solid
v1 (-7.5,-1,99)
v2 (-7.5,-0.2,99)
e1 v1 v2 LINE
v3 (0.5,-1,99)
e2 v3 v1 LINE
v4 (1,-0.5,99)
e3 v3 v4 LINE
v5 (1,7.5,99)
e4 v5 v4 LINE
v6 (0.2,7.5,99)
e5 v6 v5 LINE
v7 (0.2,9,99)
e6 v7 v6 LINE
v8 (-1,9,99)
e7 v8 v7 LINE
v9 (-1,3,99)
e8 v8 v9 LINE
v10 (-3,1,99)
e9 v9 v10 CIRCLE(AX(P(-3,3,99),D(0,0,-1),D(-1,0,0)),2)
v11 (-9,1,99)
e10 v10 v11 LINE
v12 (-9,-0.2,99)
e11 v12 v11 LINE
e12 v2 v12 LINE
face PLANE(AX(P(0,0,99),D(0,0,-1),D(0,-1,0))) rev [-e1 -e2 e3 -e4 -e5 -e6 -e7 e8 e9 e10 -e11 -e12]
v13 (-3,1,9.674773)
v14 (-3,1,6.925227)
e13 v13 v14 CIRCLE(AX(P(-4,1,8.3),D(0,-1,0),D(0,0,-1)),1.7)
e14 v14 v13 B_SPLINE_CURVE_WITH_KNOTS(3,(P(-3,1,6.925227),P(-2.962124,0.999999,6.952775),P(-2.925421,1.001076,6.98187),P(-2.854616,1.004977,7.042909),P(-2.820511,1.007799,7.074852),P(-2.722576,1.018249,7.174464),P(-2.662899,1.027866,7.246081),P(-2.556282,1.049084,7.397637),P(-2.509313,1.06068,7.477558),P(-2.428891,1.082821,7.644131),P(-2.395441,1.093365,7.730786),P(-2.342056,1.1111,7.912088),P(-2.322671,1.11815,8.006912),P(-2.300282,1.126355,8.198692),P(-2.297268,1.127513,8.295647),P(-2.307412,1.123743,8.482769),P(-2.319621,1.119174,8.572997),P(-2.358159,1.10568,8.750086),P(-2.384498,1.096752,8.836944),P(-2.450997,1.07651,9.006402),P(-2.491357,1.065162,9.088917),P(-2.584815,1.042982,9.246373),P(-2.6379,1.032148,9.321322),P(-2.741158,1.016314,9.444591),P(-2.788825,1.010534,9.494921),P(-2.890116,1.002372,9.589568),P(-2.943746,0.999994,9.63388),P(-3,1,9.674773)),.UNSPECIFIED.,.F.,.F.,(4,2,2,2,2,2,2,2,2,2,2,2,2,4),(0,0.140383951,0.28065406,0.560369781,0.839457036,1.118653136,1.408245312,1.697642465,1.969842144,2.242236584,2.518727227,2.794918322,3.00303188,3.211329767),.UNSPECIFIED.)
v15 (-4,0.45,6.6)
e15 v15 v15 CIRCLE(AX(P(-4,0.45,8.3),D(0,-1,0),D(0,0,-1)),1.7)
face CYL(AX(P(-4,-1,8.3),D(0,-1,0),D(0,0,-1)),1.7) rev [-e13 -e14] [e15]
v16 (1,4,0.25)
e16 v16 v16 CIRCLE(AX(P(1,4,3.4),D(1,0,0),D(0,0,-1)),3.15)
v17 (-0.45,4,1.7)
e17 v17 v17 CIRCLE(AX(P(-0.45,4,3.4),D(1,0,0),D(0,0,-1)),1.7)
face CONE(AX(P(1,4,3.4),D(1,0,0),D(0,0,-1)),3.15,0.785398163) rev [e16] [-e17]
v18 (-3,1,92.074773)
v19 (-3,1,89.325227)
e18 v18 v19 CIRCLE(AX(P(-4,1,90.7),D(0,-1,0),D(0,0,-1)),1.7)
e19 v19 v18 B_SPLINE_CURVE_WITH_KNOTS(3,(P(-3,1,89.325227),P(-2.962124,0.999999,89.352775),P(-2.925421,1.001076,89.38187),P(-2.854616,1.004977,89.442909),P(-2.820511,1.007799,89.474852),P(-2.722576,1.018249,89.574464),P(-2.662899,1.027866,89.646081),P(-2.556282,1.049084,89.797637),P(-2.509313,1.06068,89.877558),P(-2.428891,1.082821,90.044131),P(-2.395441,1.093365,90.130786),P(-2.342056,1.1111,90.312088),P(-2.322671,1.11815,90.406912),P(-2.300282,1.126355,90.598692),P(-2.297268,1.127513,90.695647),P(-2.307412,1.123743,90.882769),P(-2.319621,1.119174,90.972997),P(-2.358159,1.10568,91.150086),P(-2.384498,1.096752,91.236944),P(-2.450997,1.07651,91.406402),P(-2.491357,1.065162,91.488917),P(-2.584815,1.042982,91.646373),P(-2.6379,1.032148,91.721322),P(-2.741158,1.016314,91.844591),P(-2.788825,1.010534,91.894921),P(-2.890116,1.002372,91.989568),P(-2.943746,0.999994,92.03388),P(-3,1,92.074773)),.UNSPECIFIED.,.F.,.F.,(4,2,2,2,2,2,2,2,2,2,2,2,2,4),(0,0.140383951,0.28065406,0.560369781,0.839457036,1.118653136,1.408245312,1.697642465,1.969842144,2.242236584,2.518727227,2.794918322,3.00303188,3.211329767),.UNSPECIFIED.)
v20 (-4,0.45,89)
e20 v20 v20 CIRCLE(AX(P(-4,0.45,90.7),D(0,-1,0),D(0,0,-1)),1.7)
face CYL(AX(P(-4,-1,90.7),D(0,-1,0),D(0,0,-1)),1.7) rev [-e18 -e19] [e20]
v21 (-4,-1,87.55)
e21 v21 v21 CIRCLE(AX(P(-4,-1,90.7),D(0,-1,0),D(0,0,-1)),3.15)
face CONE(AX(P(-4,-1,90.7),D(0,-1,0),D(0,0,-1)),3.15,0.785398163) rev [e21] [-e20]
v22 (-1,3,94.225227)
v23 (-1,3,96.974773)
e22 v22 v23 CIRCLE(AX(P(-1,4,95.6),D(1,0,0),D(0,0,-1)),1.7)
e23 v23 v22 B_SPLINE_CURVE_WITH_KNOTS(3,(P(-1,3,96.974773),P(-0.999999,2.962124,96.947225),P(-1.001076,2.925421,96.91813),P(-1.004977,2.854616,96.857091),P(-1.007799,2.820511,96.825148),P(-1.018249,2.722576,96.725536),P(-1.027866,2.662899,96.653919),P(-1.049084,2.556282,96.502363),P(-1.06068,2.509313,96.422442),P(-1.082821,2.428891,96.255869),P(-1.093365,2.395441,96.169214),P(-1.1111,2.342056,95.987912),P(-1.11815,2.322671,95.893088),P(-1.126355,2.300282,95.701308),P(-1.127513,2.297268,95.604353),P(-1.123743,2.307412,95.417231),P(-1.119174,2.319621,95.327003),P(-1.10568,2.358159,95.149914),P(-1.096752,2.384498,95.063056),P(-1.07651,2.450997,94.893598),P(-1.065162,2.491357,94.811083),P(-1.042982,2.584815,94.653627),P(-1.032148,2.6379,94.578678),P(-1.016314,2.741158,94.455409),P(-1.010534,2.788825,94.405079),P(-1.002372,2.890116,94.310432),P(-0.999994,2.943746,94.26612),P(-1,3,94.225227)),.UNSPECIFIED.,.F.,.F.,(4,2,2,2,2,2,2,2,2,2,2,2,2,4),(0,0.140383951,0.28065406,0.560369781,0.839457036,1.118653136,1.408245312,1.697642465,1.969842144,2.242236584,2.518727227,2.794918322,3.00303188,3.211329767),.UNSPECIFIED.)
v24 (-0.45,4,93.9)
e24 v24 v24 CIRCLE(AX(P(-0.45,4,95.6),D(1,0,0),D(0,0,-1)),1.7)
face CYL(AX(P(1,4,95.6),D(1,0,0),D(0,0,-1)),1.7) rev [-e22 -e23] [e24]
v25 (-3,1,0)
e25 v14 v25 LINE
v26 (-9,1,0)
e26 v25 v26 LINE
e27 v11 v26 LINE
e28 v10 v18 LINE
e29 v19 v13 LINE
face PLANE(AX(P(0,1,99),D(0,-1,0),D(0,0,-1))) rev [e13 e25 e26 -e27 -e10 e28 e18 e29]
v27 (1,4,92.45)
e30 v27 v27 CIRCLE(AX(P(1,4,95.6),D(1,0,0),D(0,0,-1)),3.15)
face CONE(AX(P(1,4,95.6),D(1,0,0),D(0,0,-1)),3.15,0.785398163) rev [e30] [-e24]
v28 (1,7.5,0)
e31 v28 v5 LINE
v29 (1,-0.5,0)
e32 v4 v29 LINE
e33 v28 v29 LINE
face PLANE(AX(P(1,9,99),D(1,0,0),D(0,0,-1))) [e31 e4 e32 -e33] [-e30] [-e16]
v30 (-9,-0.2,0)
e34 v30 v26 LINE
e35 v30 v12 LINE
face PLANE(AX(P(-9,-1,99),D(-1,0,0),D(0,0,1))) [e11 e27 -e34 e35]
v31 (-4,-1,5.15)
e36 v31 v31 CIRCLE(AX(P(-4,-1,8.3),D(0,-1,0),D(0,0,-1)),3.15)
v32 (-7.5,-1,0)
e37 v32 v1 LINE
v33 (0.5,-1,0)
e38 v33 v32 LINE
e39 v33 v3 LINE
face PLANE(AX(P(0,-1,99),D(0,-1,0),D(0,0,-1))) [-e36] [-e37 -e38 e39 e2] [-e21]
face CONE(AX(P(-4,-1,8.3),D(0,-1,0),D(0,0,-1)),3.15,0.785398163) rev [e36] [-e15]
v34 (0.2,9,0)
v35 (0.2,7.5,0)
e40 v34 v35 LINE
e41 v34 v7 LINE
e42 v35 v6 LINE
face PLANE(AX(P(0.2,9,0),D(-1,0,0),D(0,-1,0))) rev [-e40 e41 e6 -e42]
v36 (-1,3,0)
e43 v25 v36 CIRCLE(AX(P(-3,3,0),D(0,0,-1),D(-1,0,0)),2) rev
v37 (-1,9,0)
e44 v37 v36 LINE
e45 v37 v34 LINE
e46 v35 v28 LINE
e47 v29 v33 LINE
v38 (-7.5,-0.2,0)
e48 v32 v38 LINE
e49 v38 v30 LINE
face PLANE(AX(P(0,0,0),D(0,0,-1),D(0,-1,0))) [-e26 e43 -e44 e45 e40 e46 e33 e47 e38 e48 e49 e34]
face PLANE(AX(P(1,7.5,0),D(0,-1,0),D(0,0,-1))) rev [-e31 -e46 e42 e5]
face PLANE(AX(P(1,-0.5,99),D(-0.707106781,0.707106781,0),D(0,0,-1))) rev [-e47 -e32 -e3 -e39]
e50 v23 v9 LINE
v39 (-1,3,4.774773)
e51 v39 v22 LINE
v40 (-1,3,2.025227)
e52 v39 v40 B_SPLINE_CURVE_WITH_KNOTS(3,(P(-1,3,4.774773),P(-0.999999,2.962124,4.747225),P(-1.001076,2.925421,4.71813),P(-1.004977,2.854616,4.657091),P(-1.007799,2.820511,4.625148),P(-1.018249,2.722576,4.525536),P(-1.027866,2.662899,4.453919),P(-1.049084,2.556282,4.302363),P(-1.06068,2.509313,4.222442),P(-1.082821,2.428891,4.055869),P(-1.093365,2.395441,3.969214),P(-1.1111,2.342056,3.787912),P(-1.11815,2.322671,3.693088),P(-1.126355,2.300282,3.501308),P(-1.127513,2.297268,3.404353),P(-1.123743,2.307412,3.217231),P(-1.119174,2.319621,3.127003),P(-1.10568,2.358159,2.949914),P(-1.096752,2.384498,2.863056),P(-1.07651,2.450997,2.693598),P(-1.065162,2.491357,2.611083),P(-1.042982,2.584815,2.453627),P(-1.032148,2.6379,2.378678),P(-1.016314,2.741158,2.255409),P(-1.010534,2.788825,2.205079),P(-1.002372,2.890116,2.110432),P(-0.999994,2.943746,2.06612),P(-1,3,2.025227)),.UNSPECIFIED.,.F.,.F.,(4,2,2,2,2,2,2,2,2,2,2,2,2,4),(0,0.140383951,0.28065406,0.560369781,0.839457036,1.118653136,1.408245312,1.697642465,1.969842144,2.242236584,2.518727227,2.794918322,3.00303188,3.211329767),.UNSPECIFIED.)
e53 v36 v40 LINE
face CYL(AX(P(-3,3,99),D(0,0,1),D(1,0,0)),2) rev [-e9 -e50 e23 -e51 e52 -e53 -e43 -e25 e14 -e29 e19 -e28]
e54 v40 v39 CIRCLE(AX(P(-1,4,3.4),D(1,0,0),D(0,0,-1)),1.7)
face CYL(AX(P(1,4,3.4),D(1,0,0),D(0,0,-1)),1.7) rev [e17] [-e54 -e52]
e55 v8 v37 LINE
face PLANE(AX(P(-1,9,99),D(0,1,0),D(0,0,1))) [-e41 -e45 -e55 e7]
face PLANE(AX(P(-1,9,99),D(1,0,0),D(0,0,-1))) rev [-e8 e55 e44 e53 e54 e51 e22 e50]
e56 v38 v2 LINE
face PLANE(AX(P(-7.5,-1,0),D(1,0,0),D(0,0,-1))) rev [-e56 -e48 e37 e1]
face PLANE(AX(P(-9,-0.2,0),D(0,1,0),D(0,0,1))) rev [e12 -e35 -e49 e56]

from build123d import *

# Parameters (mm, degrees)
EXTRUDE_THIN1_DEPTH = 99
CHAMFER1_SIZE       = 0.5
FILLET1_R           = 2
SKETCH2_W           = 1.5
SKETCH2_H           = 0.8
SKETCH2_W_2         = 0.8
SKETCH2_H_2         = 1.5
CUT_EXTRUDE1_DEPTH  = 100.814828558


# Read off the part's stored shape, not the designer's step: Mirror1
with BuildPart() as part:
    # Sketch1 → Extrude-Thin1 (new body)
    with BuildSketch(Plane(origin=(0, 0, 0), x_dir=(0, 1, 0), z_dir=(0, 0, 1))):
        Polygon((9, 1), (1, 1), (1, 9), (-1, 9), (-1, -1), (9, -1), align=None)
    extrude(amount=EXTRUDE_THIN1_DEPTH)

    # Chamfer1
    chamfer1_edges = [part.edges().sort_by_distance(p)[0] for p in [
        (1, -1, 49.5),
    ]]
    chamfer(chamfer1_edges, length=CHAMFER1_SIZE)

    # Fillet1
    fillet1_edges = [part.edges().sort_by_distance(p)[0] for p in [
        (-1, 1, 49.5),
    ]]
    fillet(fillet1_edges, radius=FILLET1_R)

    # Sketch2 → Cut-Extrude1 (cut, through all)
    with BuildSketch(Plane.XY.offset(99)):
        with Locations((-8.25, -0.6)):
            Rectangle(SKETCH2_W, SKETCH2_H)
        with Locations((0.6, 8.25)):
            Rectangle(SKETCH2_W_2, SKETCH2_H_2)
    extrude(amount=-CUT_EXTRUDE1_DEPTH, mode=Mode.SUBTRACT)

    # Sketch5 → CSK for M3 Flat Head Machine Screw1 (revolve, cut)
    with BuildSketch(Plane(origin=(1, 4, 3.4), x_dir=(0, 0, -1), z_dir=(0, 1, 0))):
        Polygon((0, 0), (0, 10), (1.7, 10), (1.7, 1.45), (3.15, 0), align=None)
    revolve(axis=Axis((7.35, 4, 3.4), (-1, 0, 0)), mode=Mode.SUBTRACT)

    # Sketch5 at point 2 (carried to point 2, square into its face) → CSK for M3 Flat Head Machine Screw1 at 2 (revolve, cut)
    with BuildSketch(Plane(origin=(-4, -1, 8.3), x_dir=(0, 0, -1), z_dir=(1, 0, 0))):
        Polygon((0, 0), (0, 10), (1.7, 10), (1.7, 1.45), (3.15, 0), align=None)
    revolve(axis=Axis((-4, -7.35, 8.3), (0, 1, 0)), mode=Mode.SUBTRACT)

    # Mirror1 outline → Mirror1 (revolve, cut)
    with BuildSketch(Plane(origin=(-4, 0, 90.7), x_dir=(1, 0, 0), z_dir=(0, 0, 1))):
        Polygon((1.7, 0.45), (1.7, 1.126574026), (0, 1.126574026), (0, -1), (3.15, -1), align=None)
    revolve(axis=Axis((-4, 0, 90.7), (0, 1, 0)), mode=Mode.SUBTRACT)

    # Mirror1 2 outline → Mirror1 2 (revolve, cut)
    with BuildSketch(Plane(origin=(0, 4, 95.6), x_dir=(0, 1, 0), z_dir=(0, 0, -1))):
        Polygon((0, -1.126574026), (1.7, -1.126574026), (1.7, -0.45), (3.15, 1), (0, 1), align=None)
    revolve(axis=Axis((0, 4, 95.6), (1, 0, 0)), mode=Mode.SUBTRACT)


solid = part.part
